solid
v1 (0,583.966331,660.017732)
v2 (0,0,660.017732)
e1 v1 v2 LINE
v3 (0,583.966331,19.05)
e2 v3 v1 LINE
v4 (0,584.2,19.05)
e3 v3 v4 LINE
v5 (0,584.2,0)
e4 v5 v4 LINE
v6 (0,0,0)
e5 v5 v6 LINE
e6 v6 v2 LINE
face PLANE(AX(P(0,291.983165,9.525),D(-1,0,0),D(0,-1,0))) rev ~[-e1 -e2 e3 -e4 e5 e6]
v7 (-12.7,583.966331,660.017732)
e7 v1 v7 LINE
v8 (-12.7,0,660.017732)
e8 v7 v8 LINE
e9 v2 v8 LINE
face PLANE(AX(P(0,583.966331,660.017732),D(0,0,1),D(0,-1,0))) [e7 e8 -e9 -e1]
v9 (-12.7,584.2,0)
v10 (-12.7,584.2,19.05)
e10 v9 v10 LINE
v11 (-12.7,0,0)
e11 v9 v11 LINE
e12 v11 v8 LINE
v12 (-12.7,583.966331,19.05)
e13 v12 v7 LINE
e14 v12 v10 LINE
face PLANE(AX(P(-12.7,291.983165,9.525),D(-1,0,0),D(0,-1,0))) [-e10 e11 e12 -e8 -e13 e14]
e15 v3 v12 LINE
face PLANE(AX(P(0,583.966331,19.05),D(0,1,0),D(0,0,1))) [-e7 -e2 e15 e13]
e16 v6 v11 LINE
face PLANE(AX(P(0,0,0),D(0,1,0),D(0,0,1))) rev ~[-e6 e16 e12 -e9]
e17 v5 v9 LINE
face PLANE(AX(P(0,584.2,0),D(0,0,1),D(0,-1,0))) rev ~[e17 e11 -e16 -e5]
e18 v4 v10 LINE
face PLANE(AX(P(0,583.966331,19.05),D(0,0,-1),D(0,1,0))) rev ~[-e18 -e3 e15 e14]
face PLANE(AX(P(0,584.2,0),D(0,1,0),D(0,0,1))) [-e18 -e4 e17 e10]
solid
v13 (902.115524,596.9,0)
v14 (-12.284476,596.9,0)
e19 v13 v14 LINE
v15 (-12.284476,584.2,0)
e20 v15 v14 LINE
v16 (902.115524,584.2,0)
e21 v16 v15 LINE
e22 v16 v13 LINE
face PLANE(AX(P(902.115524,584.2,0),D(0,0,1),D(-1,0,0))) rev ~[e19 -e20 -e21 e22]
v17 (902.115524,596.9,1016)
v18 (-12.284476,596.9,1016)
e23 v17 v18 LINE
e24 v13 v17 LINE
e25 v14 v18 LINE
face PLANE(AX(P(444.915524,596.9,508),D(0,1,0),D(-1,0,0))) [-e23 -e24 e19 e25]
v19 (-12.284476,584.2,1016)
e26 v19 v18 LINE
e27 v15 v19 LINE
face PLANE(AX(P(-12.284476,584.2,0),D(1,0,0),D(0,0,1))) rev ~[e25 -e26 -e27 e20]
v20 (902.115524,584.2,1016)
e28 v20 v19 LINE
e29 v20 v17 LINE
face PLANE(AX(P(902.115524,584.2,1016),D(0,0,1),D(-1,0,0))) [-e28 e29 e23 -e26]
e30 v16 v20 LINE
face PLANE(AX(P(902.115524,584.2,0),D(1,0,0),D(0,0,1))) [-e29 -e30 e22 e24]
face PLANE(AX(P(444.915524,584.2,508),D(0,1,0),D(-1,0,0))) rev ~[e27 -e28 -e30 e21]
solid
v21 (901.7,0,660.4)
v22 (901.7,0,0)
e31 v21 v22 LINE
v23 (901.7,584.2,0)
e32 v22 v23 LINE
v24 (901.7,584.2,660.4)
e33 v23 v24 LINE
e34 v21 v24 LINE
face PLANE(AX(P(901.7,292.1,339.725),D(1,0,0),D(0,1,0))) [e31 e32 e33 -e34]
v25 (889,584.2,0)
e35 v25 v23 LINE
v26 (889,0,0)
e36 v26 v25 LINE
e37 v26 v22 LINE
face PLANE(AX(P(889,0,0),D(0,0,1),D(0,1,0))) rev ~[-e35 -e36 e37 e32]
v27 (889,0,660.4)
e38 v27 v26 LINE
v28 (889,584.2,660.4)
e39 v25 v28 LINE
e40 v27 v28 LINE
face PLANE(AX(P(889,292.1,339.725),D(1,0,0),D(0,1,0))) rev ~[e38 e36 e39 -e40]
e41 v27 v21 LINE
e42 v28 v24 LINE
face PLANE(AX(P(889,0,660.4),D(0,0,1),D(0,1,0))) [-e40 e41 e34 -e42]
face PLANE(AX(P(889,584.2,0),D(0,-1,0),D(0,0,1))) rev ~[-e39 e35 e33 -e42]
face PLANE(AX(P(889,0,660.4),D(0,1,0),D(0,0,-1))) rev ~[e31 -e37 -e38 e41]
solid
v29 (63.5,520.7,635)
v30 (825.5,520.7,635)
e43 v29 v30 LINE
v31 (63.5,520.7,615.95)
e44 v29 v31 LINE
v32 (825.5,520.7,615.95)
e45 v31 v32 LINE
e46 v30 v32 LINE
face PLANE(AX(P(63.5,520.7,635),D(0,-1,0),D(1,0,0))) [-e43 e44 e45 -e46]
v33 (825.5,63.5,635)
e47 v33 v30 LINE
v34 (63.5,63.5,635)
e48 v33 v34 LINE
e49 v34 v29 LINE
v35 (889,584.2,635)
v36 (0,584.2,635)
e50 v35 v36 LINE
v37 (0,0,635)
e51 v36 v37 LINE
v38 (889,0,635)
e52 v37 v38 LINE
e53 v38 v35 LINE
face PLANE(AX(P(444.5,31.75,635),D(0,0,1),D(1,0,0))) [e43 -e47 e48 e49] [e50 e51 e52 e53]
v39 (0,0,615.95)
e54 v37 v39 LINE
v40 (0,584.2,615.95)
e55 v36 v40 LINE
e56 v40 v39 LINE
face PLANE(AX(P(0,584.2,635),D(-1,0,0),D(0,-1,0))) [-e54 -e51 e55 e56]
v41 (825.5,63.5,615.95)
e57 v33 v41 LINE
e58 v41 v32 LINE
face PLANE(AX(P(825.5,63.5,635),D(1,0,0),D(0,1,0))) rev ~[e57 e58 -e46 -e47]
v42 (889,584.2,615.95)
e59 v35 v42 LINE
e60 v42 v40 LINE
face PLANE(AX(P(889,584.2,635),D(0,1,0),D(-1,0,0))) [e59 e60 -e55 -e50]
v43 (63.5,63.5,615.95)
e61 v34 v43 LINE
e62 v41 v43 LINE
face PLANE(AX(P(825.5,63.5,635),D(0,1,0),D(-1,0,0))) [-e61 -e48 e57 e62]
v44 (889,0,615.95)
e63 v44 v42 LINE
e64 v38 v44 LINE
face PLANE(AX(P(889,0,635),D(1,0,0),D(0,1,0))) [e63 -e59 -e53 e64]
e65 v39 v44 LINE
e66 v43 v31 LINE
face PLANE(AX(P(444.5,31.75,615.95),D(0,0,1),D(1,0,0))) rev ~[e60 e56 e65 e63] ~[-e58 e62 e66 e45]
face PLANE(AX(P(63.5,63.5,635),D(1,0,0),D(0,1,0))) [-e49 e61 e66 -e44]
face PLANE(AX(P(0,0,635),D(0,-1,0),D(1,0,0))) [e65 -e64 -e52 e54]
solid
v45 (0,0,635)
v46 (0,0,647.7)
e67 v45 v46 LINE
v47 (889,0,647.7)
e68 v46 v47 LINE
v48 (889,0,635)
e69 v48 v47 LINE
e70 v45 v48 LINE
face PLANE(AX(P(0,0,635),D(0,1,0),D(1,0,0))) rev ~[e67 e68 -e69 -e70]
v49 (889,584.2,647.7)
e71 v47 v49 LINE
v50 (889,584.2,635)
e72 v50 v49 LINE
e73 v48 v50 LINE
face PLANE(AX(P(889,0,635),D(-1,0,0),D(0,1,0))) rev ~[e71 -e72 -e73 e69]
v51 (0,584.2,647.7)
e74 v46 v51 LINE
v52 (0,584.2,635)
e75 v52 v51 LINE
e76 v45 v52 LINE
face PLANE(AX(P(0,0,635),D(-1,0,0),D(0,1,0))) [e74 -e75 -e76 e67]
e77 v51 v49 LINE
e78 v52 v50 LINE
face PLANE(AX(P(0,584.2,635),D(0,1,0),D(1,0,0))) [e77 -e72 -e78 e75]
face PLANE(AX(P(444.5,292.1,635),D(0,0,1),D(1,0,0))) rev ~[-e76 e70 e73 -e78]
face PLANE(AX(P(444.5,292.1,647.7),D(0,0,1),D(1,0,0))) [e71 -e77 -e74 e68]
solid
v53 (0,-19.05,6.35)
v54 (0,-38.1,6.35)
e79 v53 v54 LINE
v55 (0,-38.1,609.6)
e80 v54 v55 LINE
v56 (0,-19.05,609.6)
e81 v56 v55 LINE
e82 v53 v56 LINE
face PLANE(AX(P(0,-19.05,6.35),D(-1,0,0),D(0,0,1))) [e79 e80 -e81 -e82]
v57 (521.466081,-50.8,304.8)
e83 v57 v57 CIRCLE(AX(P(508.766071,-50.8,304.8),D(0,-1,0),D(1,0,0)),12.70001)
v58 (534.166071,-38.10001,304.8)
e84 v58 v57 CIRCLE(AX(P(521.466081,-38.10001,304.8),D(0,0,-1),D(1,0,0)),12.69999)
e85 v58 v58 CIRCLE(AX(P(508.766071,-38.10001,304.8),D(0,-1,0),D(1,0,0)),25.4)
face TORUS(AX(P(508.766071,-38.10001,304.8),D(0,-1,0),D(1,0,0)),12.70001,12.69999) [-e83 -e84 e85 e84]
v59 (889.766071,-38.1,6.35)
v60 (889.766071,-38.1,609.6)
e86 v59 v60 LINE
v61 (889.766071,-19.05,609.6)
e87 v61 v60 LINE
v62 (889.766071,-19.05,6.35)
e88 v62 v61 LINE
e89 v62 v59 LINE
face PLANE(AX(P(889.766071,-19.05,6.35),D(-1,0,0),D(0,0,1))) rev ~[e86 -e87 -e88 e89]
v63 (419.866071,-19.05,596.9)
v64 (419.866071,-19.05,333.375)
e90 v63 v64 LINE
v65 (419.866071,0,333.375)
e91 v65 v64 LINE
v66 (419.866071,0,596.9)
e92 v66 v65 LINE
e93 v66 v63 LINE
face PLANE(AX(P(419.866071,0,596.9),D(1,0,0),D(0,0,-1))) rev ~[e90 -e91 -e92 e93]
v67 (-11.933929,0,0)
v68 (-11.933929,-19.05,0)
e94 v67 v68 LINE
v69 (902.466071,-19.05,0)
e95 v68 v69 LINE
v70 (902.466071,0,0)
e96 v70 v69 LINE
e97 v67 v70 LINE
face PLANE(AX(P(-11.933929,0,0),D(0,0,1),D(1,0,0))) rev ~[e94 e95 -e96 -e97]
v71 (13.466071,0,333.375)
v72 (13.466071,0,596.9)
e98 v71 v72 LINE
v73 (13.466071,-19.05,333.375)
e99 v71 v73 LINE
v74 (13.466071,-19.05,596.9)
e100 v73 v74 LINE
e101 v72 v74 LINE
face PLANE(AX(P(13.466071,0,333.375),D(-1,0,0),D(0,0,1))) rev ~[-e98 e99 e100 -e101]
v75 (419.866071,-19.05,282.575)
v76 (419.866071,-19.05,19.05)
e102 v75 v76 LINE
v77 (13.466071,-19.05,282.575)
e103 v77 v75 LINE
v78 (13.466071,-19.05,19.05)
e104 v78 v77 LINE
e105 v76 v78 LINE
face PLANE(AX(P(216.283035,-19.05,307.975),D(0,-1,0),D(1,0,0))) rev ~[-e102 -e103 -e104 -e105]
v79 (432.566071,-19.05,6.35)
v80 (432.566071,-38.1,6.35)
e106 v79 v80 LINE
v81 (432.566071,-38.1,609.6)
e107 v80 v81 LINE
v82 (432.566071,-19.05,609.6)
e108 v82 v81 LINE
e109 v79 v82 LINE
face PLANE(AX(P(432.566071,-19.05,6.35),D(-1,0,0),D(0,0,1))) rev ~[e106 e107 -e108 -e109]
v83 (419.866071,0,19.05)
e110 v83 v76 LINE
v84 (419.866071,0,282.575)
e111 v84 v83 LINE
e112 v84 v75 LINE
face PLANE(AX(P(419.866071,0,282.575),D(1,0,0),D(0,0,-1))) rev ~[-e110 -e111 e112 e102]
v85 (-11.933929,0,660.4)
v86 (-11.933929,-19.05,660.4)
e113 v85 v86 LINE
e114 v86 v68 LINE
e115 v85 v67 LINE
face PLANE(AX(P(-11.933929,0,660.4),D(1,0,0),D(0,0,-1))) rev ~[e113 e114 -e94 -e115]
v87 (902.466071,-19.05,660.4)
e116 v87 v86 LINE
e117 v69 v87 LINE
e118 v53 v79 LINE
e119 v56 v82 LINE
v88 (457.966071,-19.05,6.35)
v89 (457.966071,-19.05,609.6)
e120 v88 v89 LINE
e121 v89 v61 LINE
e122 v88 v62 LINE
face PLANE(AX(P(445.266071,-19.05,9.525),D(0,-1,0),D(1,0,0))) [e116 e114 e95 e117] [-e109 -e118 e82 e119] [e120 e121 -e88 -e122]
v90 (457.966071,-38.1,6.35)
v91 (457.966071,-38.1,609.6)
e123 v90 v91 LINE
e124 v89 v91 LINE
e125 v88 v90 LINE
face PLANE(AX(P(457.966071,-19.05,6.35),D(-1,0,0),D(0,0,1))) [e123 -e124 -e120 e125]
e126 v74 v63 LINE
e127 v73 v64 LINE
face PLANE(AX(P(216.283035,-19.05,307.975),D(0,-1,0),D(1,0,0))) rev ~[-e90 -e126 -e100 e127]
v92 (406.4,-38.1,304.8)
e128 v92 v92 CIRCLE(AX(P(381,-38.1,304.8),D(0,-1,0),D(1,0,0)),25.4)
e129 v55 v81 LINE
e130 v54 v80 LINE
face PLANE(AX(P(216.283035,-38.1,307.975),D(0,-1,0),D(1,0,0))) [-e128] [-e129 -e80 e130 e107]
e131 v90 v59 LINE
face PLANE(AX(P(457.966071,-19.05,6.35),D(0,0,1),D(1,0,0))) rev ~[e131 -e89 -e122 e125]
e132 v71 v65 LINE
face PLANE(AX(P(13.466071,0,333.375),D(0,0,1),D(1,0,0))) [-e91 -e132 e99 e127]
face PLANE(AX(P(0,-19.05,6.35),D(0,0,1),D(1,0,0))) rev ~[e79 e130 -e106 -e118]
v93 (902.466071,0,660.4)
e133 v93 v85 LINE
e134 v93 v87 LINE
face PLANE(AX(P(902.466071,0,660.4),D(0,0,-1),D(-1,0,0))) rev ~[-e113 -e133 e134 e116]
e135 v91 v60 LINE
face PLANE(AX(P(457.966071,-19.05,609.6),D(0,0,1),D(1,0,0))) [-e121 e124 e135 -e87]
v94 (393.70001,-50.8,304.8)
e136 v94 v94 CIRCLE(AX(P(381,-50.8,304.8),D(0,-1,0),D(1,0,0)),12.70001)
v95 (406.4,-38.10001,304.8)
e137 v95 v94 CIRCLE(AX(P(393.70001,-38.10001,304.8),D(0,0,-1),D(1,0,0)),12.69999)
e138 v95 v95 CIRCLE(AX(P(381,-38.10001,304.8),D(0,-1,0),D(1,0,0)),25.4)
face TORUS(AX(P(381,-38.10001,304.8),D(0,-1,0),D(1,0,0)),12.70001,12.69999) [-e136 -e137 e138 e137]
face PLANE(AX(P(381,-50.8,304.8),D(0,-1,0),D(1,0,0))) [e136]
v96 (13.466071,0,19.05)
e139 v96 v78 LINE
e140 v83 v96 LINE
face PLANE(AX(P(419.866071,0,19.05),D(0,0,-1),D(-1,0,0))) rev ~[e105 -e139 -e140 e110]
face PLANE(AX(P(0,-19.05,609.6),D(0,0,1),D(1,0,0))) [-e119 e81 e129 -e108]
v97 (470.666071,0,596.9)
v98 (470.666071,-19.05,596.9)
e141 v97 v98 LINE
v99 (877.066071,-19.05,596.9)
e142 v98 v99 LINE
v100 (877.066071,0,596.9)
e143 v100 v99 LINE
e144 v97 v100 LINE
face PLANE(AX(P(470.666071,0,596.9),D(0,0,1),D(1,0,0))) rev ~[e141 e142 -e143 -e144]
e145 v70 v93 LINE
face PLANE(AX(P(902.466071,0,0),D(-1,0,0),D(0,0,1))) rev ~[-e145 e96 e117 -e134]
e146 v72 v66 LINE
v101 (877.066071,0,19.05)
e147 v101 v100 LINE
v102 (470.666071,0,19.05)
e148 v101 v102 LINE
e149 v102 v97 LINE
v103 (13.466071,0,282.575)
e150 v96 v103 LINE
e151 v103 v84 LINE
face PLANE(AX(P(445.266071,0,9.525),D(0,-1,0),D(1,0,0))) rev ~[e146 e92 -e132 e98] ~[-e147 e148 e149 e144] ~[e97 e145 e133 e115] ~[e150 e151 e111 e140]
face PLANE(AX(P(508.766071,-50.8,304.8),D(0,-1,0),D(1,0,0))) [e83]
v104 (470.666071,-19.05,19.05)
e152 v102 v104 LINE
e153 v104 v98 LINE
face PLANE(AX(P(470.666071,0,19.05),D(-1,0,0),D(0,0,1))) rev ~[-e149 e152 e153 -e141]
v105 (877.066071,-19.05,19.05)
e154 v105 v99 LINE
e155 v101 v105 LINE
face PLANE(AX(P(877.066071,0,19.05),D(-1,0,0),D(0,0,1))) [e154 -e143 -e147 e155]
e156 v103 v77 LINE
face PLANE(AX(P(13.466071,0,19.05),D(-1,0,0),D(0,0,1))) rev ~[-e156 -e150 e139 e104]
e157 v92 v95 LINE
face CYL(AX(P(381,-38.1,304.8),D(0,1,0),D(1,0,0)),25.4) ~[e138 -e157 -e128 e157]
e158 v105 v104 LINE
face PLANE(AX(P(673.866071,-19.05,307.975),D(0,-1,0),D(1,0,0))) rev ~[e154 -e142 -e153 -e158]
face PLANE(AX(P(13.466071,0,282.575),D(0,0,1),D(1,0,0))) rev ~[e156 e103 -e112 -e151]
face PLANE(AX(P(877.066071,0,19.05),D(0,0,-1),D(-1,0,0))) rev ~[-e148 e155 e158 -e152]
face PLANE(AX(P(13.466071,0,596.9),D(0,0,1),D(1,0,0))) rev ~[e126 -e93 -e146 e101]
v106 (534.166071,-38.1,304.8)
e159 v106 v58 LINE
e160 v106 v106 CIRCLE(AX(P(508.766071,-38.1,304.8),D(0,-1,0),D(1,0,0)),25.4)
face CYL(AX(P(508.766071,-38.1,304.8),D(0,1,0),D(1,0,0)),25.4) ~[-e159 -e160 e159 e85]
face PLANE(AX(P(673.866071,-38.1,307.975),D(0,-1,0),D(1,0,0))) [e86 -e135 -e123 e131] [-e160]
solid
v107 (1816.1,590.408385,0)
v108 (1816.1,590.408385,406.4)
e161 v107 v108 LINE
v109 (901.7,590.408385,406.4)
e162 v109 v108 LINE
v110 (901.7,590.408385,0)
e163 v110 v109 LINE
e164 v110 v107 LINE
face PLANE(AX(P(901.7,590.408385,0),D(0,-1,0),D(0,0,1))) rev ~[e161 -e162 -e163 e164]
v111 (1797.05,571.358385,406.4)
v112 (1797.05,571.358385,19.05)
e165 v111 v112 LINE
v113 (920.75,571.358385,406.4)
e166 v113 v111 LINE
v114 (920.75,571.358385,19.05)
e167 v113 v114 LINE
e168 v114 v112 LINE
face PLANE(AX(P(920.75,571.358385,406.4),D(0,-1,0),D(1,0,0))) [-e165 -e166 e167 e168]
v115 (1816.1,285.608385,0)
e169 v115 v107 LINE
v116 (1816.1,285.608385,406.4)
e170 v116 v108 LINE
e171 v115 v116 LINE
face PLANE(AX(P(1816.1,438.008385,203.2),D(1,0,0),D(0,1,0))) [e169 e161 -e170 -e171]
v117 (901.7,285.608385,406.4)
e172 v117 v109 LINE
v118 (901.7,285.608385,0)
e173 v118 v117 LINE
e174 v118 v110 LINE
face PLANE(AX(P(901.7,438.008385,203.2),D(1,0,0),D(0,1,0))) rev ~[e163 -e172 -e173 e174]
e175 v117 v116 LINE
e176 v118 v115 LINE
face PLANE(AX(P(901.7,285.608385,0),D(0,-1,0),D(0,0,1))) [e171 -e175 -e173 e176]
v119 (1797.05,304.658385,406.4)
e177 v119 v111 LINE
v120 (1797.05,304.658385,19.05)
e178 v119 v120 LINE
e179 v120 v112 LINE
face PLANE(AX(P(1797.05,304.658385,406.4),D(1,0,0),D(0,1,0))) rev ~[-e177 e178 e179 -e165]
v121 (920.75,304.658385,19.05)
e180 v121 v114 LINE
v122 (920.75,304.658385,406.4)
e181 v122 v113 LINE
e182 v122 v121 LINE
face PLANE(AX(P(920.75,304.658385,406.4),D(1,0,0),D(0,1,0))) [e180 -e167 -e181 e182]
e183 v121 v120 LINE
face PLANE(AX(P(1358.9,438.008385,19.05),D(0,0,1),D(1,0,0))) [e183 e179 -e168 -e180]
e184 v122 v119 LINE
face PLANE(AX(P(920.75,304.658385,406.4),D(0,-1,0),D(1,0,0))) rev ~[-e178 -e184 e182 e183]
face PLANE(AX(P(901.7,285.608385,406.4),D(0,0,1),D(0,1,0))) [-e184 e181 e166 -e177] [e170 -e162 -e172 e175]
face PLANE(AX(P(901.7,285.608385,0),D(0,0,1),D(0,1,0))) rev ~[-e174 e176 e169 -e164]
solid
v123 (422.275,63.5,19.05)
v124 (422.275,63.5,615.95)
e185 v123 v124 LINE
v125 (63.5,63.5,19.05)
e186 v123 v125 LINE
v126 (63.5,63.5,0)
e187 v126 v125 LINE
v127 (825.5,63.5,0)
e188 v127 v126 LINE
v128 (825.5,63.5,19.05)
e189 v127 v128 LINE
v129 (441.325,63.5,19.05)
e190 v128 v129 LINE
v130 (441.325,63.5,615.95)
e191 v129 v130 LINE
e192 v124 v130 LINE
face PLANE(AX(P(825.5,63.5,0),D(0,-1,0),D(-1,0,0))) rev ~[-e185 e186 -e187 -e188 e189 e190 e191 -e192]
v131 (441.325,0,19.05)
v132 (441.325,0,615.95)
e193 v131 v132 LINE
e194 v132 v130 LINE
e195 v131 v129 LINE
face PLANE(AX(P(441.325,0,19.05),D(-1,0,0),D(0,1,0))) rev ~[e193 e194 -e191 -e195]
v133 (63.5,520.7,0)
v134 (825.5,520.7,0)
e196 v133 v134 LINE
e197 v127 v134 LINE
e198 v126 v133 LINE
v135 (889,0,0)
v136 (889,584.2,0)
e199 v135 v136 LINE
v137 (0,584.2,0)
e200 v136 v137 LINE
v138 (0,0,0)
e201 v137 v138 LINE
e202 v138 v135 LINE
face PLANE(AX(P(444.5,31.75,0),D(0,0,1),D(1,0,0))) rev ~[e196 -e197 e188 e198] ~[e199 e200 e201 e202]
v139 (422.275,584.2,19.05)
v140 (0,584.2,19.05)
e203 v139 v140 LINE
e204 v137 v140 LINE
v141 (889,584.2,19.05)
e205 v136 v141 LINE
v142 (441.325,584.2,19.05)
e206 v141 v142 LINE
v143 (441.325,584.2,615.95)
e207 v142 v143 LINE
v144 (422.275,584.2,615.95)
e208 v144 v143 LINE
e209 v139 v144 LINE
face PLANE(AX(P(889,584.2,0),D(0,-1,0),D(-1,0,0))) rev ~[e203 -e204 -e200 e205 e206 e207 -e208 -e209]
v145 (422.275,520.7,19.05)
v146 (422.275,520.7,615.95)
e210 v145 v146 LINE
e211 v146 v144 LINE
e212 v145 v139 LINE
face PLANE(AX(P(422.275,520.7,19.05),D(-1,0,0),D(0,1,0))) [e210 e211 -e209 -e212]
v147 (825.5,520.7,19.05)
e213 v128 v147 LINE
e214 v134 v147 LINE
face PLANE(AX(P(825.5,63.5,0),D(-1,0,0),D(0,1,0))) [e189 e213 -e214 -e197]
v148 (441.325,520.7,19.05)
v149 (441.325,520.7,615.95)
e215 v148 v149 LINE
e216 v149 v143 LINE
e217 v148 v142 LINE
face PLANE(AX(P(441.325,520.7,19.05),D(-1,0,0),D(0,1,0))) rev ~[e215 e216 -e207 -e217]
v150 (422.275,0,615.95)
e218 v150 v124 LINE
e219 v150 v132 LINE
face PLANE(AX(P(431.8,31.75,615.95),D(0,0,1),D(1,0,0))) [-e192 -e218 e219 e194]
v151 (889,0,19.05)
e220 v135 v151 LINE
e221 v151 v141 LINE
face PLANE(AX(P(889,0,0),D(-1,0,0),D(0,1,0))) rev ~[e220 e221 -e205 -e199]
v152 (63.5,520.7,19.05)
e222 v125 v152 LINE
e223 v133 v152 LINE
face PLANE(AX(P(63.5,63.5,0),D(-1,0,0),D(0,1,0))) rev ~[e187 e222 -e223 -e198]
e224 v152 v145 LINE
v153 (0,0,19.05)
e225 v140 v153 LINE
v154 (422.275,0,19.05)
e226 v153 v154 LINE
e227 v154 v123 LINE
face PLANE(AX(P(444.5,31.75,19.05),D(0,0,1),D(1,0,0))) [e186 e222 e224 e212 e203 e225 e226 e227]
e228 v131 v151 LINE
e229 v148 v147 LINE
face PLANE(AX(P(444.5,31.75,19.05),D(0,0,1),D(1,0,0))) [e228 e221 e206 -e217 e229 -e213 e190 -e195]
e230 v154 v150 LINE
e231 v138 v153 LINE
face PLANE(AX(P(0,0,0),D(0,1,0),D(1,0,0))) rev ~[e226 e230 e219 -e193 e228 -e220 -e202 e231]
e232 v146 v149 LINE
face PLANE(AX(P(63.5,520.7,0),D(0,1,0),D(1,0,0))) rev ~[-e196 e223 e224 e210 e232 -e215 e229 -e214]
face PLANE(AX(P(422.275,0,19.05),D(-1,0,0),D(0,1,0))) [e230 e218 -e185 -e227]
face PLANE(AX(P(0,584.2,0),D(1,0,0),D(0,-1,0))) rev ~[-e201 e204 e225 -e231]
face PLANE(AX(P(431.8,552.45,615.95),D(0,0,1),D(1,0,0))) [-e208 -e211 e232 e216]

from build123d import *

# Parameters (mm, degrees)
F0_W      = 63.5
F0_H      = 457.2
F1_DEPTH  = 19.05
F2_W      = 584.2
F2_H      = 641.35
F2_H_2    = 19.05
F3_DEPTH  = 12.7
F4_W      = 583.9663306236
F4_H      = 19.05
F4_W_2    = 0.2336693764
F4_H_2    = 640.9677320718
F5_DEPTH  = 12.7
F6_W      = 914.4
F6_H      = 1016
F7_DEPTH  = 12.7
F8_W      = 25.4
F8_H      = 577.85
F8_W_2    = 406.4
F8_H_2    = 50.8
F9_DEPTH  = 19.05
F10_W     = 431.8
F10_H     = 603.25
F10_W_2   = 406.4
F10_H_2   = 577.85
F10_W_3   = 432.5660707131
F10_H_3   = 263.525
F11_DEPTH = 19.05
F12_R     = 25.4
F13_DEPTH = 12.7
F14_R     = 12.69999
F15_W     = 304.8
F15_H     = 406.4
F16_DEPTH = 914.4
F17_W     = 876.3
F17_H     = 266.7
F19_DEPTH = 387.35
F20_W     = 63.5
F20_H     = 457.2
F21_DEPTH = 19.05
F22_W     = 19.05
F22_H     = 63.5
F23_DEPTH = 596.9
F24_W     = 889
F24_H     = 584.2
F25_DEPTH = 12.7


# Not quite as in the source:
# - a fillet or chamfer is up to 0.001 mm smaller than in the source, because OpenCascade refuses the exact size
# - a feature names something its author has since deleted; it is built from what else it names


with BuildPart() as f1:
    # F0 (on Top) → F1 (new body)
    with BuildSketch(Plane.XY):
        Polygon((0, 63.5), (0, 0), (889, 0), (889, 63.5), (825.5, 63.5), (63.5, 63.5), align=None)
        with Locations((31.75, 292.1)):
            Rectangle(F0_W, F0_H)
        with Locations((857.25, 292.1)):
            Rectangle(F0_W, F0_H)
        Polygon((0, 584.2), (0, 520.7), (63.5, 520.7), (825.5, 520.7), (889, 520.7), (889, 584.2), align=None)
    extrude(amount=F1_DEPTH)

    # F22 (on face) → F23 (join, through all)
    with BuildSketch(Plane.XY.offset(19.05)):
        with Locations((431.8, 31.75)):
            Rectangle(F22_W, F22_H)
        with Locations((431.8, 552.45)):
            Rectangle(F22_W, F22_H)
    extrude(amount=F23_DEPTH)


with BuildPart() as f3:
    # F2 (on face) → F3 (new body)
    with BuildSketch(Plane.YZ.offset(889)):
        with Locations((292.1, 339.725)):
            Rectangle(F2_W, F2_H)
        with Locations((292.1, 9.525)):
            Rectangle(F2_W, F2_H_2)
    extrude(amount=F3_DEPTH)


with BuildPart() as f5:
    # F4 (on face) → F5 (new body)
    with BuildSketch(Plane(origin=(0, 0, 0), x_dir=(0, -1, 0), z_dir=(-1, 0, 0))):
        with Locations((-291.9831653118, 9.525)):
            Rectangle(F4_W, F4_H)
        with Locations((-584.0831653118, 9.525)):
            Rectangle(F4_W_2, F4_H)
        with Locations((-291.9831653118, 339.5338660359)):
            Rectangle(F4_W, F4_H_2)
    extrude(amount=F5_DEPTH)


with BuildPart() as f7:
    # F6 (on face) → F7 (new body)
    with BuildSketch(Plane(origin=(0, 584.2, 0), x_dir=(-1, 0, 0), z_dir=(0, 1, 0))):
        with Locations((-444.9155238152, 508)):
            Rectangle(F6_W, F6_H)
    extrude(amount=F7_DEPTH)


with BuildPart() as f9:
    # F8 (on face) → F9 (new body)
    with BuildSketch(Plane.XZ):
        Polygon((-11.9339292869, 19.05), (-11.9339292869, 0), (902.4660707131, 0), (902.4660707131, 19.05), (877.0660707131, 19.05), (470.6660707131, 19.05), (419.8660707131, 19.05), (13.4660707131, 19.05), align=None)
        Polygon((-11.9339292869, 596.9), (-11.9339292869, 19.05), (13.4660707131, 19.05), (13.4660707131, 282.575), (13.4660707131, 333.375), (13.4660707131, 596.9), align=None)
        with Locations((889.7660707131, 307.975)):
            Rectangle(F8_W, F8_H)
        Polygon((-11.9339292869, 660.4), (-11.9339292869, 596.9), (13.4660707131, 596.9), (419.8660707131, 596.9), (470.6660707131, 596.9), (877.0660707131, 596.9), (902.4660707131, 596.9), (902.4660707131, 660.4), align=None)
        Polygon((419.8660707131, 282.575), (419.8660707131, 19.05), (470.6660707131, 19.05), (470.6660707131, 596.9), (419.8660707131, 596.9), (419.8660707131, 333.375), align=None)
        with Locations((216.6660707131, 307.975)):
            Rectangle(F8_W_2, F8_H_2)
    extrude(amount=F9_DEPTH)

    # F10 (on face) → F11 (join)
    with BuildSketch(Plane.XZ.offset(19.05)):
        with Locations((673.8660707131, 307.975)):
            Rectangle(F10_W, F10_H)
        with Locations((673.8660707131, 307.975)):
            Rectangle(F10_W_2, F10_H_2, mode=Mode.SUBTRACT)
        with Locations((673.8660707131, 307.975)):
            Rectangle(F10_W_2, F10_H_2)
        with Locations((216.2830353566, 307.975)):
            Rectangle(F10_W_3, F10_H)
        with Locations((216.6660707131, 150.8125)):
            Rectangle(F10_W_2, F10_H_3, mode=Mode.SUBTRACT)
        with Locations((216.6660707131, 465.1375)):
            Rectangle(F10_W_2, F10_H_3, mode=Mode.SUBTRACT)
        with Locations((216.6660707131, 465.1375)):
            Rectangle(F10_W_2, F10_H_3)
        with Locations((216.6660707131, 150.8125)):
            Rectangle(F10_W_2, F10_H_3)
    extrude(amount=F11_DEPTH)

    # F12 (on face) → F13 (join)
    with BuildSketch(Plane.XZ.offset(38.1)):
        with Locations((508.7660707131, 304.8)):
            Circle(F12_R)
        with Locations((381, 304.8)):
            Circle(F12_R)
    extrude(amount=F13_DEPTH)

    # F14 (radius 12.7 in the source; OpenCascade refuses exactly that, so slightly less here)
    f14_edges = [f9.edges().sort_by_distance(p)[0] for p in [
        (483.366071, -50.8, 304.8),
        (355.6, -50.8, 304.8),
    ]]
    fillet(f14_edges, radius=F14_R)


with BuildPart() as f16:
    # F15 (on face) → F16 (new body)
    with BuildSketch(Plane.YZ.offset(901.7)):
        with Locations((438.0083848, 203.2)):
            Rectangle(F15_W, F15_H)
    extrude(amount=F16_DEPTH)

    # F17 (on face) → F19 (cut, through all)
    with BuildSketch(Plane.XY.offset(406.4)):
        with Locations((1358.9, 438.0083848)):
            Rectangle(F17_W, F17_H)
    extrude(amount=-F19_DEPTH, mode=Mode.SUBTRACT)


with BuildPart() as f21:
    # F20 (on offset) → F21 (new body)
    with BuildSketch(Plane.XY.offset(635)):
        Polygon((0, 63.5), (0, 0), (889, 0), (889, 63.5), (825.5, 63.5), (63.5, 63.5), align=None)
        with Locations((31.75, 292.1)):
            Rectangle(F20_W, F20_H)
        with Locations((857.25, 292.1)):
            Rectangle(F20_W, F20_H)
        Polygon((0, 584.2), (0, 520.7), (63.5, 520.7), (825.5, 520.7), (889, 520.7), (889, 584.2), align=None)
    extrude(amount=-F21_DEPTH)


with BuildPart() as f25:
    # F24 (on face) → F25 (new body)
    with BuildSketch(Plane.XY.offset(635)):
        with Locations((444.5, 292.1)):
            Rectangle(F24_W, F24_H)
    extrude(amount=F25_DEPTH)


solid = Compound([f1.part, f3.part, f5.part, f7.part, f9.part, f16.part, f21.part, f25.part])
